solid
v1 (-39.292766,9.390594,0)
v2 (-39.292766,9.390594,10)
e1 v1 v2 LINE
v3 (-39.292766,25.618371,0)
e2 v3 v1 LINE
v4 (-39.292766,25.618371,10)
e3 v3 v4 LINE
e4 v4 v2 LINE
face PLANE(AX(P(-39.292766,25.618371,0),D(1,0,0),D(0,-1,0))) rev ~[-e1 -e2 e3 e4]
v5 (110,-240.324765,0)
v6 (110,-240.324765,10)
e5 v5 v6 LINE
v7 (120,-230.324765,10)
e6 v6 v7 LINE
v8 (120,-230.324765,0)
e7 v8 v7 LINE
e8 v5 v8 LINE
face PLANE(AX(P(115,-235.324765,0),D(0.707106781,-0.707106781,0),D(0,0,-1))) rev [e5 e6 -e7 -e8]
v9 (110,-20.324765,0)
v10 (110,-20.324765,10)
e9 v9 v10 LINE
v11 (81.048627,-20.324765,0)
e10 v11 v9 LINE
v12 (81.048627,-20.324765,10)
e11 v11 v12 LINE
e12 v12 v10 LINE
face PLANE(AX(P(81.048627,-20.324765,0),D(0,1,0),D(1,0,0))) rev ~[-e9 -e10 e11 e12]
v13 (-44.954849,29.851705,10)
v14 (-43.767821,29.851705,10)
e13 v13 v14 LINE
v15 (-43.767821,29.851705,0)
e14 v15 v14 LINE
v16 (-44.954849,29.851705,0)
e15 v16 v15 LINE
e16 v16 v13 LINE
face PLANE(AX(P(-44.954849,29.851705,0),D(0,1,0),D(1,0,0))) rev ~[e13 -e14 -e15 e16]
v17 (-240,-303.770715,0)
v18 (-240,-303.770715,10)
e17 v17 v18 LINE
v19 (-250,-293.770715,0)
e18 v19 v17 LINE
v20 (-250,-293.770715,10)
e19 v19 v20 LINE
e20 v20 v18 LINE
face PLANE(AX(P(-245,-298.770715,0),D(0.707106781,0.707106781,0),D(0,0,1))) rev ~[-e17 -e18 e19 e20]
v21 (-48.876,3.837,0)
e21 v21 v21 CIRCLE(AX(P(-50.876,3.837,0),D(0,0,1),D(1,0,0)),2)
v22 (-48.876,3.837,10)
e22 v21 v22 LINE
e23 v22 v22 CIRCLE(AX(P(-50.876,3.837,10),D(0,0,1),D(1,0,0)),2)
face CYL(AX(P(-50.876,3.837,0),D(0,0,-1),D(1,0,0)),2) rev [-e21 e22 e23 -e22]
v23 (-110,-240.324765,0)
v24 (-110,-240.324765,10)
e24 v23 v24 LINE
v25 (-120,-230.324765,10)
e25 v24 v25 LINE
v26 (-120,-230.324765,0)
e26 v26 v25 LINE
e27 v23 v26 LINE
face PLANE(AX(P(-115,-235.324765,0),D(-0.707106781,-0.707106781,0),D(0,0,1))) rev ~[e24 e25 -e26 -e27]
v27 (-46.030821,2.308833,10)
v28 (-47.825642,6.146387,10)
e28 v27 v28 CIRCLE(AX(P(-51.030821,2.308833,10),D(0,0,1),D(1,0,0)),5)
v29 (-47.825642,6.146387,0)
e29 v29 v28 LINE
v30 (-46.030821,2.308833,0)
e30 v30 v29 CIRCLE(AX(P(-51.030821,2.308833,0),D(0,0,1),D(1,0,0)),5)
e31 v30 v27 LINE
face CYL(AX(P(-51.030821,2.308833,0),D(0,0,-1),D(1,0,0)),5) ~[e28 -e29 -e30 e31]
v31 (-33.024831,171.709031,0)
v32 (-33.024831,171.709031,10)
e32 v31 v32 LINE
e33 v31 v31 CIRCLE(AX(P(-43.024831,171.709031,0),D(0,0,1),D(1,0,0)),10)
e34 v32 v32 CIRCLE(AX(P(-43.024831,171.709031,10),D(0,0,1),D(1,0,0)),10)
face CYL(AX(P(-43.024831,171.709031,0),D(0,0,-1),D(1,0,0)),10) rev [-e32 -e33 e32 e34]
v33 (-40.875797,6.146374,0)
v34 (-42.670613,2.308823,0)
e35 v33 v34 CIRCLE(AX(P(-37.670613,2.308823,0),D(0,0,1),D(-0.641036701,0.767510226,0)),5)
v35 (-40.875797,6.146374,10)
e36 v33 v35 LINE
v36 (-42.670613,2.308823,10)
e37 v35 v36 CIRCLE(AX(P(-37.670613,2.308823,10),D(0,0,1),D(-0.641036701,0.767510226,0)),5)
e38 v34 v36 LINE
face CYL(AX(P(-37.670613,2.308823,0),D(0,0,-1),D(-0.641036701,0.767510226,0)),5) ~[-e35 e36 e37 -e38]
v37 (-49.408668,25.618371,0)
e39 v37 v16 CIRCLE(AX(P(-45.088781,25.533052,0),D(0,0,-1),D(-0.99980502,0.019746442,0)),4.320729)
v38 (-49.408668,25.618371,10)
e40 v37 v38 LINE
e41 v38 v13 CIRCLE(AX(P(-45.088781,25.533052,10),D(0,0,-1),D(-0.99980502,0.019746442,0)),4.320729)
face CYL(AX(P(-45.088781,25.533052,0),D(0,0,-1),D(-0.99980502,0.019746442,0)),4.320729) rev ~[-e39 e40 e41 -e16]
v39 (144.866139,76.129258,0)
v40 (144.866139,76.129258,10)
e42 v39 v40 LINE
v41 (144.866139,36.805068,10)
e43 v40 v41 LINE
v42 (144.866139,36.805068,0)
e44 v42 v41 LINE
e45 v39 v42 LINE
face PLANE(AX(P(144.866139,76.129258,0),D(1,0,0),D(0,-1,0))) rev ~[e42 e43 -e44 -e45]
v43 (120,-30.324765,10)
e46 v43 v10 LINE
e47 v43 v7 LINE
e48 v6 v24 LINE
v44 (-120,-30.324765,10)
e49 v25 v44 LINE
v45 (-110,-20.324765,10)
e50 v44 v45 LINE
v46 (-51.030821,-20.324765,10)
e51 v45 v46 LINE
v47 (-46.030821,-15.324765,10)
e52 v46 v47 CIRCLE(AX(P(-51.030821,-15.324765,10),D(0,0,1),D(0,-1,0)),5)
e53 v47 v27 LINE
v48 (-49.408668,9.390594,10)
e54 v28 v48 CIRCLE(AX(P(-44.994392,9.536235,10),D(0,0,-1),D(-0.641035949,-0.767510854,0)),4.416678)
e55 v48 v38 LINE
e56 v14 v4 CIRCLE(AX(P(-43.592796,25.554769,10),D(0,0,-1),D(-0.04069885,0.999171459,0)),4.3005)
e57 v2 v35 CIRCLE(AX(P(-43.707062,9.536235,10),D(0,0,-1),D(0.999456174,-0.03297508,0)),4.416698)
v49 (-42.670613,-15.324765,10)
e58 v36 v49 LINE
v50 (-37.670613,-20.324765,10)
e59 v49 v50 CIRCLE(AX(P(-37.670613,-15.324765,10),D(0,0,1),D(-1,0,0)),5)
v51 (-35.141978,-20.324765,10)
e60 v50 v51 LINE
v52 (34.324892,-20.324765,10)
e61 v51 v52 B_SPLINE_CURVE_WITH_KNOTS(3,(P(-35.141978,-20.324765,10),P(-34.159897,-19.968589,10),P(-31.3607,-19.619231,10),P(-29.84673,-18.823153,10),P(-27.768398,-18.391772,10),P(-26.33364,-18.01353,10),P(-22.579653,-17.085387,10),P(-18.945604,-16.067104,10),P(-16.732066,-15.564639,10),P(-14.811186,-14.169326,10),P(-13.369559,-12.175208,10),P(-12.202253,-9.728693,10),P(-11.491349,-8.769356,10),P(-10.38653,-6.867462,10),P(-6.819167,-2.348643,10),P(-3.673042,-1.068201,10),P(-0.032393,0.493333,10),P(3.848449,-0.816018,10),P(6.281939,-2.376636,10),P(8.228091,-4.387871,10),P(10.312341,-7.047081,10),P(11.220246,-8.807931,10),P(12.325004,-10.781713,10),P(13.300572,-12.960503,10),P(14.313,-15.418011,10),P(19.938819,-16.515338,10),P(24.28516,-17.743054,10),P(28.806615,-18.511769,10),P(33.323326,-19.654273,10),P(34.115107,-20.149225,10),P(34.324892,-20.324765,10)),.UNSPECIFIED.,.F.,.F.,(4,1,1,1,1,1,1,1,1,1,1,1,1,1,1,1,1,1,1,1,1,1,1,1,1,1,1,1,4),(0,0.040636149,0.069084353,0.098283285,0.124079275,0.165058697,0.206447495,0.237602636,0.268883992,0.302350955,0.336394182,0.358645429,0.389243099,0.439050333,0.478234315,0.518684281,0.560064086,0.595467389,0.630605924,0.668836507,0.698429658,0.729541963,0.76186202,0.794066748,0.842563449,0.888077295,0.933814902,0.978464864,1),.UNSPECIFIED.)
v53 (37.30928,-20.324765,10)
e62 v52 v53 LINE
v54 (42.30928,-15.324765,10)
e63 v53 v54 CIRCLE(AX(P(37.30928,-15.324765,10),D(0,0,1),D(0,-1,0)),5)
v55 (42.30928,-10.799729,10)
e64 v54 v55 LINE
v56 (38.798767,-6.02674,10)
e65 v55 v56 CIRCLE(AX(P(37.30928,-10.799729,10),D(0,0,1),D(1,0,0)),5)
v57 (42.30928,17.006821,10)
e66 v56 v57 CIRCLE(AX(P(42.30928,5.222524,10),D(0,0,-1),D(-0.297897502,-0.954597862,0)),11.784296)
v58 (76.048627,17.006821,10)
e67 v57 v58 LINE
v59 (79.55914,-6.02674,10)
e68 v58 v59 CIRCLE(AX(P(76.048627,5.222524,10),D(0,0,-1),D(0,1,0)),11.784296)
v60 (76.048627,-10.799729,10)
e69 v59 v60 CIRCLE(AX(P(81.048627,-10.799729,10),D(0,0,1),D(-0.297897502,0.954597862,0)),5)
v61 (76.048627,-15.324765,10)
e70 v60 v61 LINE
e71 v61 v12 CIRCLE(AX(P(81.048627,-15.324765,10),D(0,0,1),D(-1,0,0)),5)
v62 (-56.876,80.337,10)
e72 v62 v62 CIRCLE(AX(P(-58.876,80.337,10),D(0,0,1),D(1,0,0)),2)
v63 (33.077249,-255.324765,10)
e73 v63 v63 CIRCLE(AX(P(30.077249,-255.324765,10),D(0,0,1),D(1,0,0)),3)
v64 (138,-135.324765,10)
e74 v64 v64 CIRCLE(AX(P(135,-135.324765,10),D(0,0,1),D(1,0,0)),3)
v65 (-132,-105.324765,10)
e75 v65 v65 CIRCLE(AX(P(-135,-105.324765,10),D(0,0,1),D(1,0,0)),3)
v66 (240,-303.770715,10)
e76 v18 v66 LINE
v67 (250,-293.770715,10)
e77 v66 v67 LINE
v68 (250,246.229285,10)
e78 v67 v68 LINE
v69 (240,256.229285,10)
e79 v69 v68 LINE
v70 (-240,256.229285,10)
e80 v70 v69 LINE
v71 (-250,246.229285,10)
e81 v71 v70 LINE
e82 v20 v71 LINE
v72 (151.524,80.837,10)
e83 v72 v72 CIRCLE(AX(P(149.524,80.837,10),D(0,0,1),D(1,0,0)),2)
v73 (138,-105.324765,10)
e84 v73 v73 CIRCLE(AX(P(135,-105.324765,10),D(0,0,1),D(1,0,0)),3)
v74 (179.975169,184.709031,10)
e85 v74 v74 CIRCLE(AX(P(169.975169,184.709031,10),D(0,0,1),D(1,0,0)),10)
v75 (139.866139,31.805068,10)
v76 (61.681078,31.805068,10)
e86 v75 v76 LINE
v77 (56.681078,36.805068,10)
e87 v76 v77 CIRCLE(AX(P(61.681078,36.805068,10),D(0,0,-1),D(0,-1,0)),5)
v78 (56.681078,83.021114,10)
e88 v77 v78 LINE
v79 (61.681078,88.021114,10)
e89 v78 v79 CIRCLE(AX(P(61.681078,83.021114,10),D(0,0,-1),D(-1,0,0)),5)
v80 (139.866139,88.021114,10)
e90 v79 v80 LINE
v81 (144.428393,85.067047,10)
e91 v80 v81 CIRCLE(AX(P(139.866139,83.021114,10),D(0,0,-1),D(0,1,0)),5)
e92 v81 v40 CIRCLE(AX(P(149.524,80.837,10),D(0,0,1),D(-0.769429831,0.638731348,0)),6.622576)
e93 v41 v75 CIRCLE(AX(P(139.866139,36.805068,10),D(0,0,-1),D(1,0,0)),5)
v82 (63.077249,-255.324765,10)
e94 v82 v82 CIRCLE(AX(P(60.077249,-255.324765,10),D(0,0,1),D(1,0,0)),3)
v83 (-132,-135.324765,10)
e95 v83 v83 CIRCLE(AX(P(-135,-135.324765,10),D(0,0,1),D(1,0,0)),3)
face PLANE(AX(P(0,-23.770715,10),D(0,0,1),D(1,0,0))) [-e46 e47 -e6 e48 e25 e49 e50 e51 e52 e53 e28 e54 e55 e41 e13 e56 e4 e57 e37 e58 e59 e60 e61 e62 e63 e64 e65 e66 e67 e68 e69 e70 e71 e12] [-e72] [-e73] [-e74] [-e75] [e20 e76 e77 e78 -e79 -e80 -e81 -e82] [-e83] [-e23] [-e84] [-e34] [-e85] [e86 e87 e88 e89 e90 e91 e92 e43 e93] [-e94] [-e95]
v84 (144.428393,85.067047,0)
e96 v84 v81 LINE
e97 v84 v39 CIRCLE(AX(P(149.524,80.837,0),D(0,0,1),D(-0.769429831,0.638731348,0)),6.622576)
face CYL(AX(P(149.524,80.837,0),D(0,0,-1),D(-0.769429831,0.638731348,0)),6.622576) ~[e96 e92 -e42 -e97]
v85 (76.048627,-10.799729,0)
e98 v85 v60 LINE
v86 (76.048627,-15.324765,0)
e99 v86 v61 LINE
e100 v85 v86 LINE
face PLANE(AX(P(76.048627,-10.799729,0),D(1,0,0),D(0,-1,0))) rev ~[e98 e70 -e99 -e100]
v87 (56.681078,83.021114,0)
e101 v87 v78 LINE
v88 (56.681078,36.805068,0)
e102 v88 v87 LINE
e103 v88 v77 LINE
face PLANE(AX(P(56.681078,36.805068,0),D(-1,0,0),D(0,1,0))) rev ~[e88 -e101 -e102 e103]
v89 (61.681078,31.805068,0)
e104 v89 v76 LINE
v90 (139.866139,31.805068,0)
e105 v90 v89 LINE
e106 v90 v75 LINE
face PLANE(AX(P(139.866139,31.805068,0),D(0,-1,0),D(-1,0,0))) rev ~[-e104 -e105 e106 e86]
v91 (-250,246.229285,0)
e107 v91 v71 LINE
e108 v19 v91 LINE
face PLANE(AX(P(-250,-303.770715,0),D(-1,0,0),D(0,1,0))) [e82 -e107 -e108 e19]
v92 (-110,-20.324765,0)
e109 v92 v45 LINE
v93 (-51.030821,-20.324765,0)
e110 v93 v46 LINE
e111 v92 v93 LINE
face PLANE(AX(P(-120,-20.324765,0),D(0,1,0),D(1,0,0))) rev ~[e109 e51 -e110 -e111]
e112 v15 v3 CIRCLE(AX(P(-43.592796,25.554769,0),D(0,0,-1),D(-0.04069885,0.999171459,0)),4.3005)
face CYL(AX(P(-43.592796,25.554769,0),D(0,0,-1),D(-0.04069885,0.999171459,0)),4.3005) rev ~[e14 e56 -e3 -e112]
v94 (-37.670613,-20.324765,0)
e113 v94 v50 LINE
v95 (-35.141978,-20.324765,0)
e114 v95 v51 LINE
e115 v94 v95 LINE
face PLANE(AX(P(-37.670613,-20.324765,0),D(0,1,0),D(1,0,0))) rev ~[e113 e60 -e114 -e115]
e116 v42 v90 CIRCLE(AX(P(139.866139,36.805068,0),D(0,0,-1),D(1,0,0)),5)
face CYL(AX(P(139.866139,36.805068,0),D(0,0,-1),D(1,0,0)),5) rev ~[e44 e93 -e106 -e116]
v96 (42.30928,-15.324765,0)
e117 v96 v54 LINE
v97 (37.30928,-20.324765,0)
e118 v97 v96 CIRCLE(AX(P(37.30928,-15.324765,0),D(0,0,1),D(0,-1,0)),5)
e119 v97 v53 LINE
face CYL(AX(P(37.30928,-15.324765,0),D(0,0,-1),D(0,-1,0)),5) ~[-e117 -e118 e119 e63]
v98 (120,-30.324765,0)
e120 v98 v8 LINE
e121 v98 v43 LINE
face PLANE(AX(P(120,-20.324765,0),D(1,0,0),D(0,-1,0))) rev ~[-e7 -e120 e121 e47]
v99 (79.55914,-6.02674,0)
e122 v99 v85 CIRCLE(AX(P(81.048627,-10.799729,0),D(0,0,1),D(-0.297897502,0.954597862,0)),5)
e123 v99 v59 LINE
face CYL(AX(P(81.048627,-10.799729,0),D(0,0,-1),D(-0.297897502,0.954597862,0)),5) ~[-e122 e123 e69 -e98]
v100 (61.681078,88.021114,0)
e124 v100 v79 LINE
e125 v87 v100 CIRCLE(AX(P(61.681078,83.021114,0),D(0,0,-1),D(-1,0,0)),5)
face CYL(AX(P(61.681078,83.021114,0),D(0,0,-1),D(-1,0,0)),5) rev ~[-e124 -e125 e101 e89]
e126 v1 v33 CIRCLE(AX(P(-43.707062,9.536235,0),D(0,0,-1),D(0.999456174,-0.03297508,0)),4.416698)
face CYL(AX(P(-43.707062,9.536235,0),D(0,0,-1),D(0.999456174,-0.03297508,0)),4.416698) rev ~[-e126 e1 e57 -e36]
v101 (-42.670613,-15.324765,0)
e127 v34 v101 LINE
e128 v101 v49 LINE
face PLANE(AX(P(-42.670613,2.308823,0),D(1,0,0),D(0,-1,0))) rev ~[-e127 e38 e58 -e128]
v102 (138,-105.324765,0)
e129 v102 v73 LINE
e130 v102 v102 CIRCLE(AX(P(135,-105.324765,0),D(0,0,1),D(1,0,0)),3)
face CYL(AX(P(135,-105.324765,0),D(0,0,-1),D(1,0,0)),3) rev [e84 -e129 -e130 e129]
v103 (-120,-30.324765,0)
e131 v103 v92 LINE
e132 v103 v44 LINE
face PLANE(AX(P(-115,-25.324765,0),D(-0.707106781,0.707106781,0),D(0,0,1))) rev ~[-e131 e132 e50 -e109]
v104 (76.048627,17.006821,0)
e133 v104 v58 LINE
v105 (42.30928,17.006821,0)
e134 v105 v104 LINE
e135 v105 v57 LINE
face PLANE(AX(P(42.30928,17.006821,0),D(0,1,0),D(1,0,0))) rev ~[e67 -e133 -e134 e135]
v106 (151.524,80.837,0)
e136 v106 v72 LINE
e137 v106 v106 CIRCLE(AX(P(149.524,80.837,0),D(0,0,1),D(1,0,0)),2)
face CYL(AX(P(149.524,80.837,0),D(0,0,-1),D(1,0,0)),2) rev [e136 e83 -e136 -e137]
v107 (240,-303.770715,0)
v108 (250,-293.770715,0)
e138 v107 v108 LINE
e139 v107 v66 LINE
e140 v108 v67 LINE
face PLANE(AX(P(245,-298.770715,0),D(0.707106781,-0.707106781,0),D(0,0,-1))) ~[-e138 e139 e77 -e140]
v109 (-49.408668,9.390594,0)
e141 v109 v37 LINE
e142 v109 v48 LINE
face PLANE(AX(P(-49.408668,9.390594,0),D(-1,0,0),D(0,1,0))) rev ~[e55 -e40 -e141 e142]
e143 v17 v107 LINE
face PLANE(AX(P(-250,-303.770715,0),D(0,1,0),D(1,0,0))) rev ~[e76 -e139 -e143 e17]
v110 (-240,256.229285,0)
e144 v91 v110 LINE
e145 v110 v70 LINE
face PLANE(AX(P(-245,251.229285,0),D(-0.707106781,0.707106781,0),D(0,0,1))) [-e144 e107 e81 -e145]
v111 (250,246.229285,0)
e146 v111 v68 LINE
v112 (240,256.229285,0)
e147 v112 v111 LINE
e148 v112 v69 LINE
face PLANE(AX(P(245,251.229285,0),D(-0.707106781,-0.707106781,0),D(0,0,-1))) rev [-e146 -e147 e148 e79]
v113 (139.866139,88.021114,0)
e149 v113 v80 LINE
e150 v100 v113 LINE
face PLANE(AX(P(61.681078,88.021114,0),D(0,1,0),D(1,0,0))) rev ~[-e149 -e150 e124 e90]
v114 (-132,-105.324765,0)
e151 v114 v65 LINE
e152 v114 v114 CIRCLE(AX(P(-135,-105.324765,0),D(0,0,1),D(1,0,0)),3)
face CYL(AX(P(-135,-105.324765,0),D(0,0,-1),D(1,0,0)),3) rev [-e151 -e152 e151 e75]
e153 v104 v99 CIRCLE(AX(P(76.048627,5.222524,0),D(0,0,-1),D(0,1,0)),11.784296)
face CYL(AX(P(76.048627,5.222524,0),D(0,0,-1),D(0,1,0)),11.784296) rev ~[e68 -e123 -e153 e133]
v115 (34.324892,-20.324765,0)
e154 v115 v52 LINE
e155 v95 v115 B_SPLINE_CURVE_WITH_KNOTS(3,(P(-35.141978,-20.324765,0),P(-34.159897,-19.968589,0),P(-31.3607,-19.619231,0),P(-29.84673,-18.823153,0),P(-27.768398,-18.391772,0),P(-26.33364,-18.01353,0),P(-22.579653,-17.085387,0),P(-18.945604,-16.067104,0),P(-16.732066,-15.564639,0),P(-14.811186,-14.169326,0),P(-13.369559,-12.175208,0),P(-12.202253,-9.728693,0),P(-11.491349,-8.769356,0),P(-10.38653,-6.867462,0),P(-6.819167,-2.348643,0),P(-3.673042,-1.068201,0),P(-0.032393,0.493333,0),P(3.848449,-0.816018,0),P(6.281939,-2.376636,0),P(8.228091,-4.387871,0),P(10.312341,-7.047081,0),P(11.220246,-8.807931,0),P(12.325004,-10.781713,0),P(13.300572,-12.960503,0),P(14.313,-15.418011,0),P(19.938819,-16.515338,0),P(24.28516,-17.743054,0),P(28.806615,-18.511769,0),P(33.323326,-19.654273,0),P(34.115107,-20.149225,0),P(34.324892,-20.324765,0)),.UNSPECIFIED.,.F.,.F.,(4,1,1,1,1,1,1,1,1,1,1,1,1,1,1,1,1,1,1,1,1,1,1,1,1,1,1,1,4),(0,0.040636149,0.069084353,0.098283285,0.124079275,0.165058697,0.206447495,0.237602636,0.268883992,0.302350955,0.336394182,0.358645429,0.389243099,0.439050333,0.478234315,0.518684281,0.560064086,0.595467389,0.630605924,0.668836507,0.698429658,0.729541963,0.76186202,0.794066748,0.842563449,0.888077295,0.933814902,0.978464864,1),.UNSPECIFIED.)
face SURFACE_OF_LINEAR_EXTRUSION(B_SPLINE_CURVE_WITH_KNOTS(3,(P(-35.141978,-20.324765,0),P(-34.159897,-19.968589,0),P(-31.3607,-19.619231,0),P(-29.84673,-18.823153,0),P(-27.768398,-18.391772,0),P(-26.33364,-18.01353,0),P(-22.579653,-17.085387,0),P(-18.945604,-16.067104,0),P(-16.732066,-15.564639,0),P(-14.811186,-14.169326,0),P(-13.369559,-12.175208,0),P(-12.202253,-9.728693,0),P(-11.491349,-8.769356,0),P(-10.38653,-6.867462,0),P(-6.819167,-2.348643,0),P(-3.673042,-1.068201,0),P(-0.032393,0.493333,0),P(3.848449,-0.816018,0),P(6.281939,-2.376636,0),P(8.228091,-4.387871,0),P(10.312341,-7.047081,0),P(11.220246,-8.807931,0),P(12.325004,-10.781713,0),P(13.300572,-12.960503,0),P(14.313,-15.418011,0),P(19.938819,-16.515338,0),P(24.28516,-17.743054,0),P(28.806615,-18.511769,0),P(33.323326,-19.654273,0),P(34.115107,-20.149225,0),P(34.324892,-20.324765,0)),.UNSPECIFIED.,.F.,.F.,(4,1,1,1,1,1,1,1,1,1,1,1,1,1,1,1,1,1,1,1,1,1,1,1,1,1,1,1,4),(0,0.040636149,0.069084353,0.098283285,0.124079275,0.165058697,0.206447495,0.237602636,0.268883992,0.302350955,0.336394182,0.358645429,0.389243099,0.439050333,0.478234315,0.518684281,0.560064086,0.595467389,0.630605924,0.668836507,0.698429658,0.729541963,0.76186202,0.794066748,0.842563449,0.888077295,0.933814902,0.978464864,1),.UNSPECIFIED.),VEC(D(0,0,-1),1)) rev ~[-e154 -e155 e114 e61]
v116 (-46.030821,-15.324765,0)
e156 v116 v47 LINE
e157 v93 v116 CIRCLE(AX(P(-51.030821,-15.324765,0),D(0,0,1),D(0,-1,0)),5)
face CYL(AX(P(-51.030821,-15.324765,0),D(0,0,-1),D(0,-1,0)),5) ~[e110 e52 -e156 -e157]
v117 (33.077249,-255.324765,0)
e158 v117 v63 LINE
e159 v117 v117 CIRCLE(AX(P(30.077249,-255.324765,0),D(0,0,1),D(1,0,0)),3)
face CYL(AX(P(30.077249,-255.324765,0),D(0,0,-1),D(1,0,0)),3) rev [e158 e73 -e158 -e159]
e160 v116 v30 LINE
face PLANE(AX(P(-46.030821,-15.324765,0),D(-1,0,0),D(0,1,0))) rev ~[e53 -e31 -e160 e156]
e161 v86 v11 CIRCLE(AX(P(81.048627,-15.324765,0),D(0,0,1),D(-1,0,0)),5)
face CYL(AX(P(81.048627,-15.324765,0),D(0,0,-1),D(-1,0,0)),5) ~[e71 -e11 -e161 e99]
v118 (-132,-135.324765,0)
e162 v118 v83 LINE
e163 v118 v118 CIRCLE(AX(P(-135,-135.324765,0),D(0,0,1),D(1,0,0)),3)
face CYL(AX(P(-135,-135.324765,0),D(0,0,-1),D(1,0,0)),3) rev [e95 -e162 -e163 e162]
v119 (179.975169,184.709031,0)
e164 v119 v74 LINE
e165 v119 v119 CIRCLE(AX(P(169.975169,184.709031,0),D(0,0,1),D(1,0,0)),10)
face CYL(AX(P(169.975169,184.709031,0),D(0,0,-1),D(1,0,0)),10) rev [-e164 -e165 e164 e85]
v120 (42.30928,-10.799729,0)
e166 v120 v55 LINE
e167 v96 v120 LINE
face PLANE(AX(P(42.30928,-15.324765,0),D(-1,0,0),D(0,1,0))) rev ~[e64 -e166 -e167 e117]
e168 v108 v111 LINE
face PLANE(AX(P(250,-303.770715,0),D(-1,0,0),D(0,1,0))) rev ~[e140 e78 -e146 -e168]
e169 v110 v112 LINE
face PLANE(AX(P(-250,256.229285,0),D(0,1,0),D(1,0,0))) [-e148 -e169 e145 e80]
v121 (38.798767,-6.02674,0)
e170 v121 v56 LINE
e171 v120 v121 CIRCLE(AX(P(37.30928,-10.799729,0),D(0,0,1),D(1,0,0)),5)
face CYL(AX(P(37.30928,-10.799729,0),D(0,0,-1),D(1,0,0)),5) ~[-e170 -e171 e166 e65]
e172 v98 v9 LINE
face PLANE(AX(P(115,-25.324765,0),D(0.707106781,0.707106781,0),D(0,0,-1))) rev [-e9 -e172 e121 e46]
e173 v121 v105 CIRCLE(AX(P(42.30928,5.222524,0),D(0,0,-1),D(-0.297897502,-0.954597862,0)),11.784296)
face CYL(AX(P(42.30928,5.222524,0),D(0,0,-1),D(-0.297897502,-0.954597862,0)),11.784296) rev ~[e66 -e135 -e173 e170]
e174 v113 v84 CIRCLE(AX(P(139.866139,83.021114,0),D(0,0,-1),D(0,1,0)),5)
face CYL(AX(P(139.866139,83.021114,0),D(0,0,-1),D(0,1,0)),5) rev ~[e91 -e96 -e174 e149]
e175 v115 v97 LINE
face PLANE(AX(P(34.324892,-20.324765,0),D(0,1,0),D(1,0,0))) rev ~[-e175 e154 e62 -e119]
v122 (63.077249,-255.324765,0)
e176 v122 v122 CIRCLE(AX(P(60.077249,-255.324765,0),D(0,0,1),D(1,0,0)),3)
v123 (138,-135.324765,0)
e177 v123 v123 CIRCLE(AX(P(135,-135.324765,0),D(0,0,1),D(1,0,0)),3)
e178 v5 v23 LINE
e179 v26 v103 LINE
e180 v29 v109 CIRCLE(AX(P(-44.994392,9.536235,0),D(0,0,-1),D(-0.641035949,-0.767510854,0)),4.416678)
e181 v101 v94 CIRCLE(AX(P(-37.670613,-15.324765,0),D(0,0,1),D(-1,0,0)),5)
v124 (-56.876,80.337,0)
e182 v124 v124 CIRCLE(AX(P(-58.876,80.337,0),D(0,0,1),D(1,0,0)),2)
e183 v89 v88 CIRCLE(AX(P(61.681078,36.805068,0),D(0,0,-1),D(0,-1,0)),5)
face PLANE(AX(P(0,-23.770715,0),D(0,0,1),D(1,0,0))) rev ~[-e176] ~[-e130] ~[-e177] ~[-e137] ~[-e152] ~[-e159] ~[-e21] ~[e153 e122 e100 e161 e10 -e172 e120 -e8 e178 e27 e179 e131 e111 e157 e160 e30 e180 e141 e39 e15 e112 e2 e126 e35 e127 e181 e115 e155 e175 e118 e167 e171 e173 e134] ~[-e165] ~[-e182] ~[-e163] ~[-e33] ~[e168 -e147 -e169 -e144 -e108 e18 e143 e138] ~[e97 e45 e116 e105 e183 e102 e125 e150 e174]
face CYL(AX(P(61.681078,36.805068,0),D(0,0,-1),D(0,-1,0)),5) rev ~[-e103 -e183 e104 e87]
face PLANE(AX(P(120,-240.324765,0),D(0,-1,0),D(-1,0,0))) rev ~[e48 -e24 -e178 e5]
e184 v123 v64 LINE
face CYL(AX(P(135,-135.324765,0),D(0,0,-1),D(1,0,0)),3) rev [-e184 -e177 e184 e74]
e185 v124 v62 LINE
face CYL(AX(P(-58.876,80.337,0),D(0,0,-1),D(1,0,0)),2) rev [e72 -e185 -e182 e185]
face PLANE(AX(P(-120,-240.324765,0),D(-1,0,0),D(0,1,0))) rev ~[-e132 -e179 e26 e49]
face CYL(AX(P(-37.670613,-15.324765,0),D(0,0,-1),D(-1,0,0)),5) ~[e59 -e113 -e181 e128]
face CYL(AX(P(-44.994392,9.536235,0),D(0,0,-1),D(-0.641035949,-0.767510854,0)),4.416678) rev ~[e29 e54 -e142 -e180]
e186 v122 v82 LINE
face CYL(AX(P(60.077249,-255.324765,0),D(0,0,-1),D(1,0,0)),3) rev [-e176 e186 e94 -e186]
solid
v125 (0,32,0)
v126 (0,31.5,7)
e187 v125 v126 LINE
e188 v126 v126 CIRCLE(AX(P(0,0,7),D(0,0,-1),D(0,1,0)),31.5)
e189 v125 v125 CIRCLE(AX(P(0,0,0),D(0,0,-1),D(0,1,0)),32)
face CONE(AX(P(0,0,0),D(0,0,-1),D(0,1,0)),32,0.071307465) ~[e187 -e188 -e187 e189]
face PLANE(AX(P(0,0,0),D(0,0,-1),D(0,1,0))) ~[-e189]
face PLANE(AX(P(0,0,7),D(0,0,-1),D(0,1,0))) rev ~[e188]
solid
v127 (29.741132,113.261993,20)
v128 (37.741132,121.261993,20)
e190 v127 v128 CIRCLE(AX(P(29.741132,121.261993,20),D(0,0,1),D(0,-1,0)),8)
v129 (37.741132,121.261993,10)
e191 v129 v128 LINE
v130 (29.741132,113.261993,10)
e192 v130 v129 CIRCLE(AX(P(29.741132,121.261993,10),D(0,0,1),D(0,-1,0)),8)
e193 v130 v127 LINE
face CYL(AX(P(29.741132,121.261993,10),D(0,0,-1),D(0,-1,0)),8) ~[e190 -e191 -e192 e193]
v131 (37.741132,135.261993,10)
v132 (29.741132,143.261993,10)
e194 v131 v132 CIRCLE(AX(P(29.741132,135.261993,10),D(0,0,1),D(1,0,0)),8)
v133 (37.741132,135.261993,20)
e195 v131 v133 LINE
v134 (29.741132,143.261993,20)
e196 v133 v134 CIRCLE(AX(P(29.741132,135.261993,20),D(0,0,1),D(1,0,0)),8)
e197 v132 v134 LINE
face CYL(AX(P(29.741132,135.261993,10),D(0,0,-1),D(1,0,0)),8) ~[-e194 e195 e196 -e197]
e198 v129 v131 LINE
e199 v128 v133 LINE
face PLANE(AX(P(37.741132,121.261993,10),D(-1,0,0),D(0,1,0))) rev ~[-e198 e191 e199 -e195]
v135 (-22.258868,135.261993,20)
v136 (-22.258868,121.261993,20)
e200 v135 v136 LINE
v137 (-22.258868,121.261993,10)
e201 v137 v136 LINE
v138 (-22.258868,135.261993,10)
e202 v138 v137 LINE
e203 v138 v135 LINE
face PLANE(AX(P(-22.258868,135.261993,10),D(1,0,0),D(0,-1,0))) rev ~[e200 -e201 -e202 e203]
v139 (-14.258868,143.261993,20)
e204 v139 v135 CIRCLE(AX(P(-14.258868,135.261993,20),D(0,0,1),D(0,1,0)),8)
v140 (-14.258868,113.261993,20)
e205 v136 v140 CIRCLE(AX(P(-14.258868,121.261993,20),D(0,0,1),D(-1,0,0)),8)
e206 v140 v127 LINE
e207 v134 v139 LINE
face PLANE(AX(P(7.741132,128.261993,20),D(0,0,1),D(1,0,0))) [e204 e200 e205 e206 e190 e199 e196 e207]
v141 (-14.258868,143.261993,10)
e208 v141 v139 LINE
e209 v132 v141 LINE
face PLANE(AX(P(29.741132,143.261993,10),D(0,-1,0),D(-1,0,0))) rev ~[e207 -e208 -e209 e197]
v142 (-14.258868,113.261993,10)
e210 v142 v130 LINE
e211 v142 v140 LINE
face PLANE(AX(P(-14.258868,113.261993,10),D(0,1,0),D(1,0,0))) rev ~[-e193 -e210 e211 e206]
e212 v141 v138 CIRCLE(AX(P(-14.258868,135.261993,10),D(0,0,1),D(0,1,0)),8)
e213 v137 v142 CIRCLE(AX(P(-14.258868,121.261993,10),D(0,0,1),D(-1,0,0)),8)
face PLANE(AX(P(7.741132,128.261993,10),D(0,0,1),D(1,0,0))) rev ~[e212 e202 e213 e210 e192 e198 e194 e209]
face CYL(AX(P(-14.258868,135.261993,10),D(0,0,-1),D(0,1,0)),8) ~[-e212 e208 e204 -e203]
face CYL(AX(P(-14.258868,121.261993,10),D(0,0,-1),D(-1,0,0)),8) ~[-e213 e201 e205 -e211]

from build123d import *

# Parameters (mm, degrees)
F1_W     = 500
F1_H     = 560
F1_R     = 3
F1_R_2   = 2
F1_R_3   = 10
F2_DEPTH = 10
F4_DEPTH = 10
F5_SIZE  = 10


with BuildPart() as f2:
    # F1 (on Top) → F2 (new body)
    with BuildSketch(Plane.XY):
        with Locations((0, -23.7707149982)):
            Rectangle(F1_W, F1_H)
        with Locations((30.0772486633, -255.3247647732)):
            Circle(F1_R, mode=Mode.SUBTRACT)
        with Locations((60.0772486633, -255.3247647732)):
            Circle(F1_R, mode=Mode.SUBTRACT)
        with Locations((-135, -135.3247647732)):
            Circle(F1_R, mode=Mode.SUBTRACT)
        with Locations((-135, -105.3247647732)):
            Circle(F1_R, mode=Mode.SUBTRACT)
        with Locations((-50.876, 3.837)):
            Circle(F1_R_2, mode=Mode.SUBTRACT)
        with Locations((-58.876, 80.337)):
            Circle(F1_R_2, mode=Mode.SUBTRACT)
        with Locations((-43.0248305202, 171.7090308666)):
            Circle(F1_R_3, mode=Mode.SUBTRACT)
        with BuildLine():
            Line((-120, -240.3247647732), (-120, -20.3247647732))
            Line((-120, -20.3247647732), (-51.0308213367, -20.3247647732))
            ThreePointArc((-51.0308213367, -20.3247647732), (-47.4952874307, -18.8602986792), (-46.0308213367, -15.3247647732))
            Line((-46.0308213367, -15.3247647732), (-46.0308213367, 2.308832501))
            ThreePointArc((-46.0308213367, 2.308832501), (-46.5016989751, 4.4270984509), (-47.8256415904, 6.1463867735))
            ThreePointArc((-47.8256415904, 6.1463867735), (-48.9637284761, 7.5993782677), (-49.4086683367, 9.3905942128))
            Line((-49.4086683367, 9.3905942128), (-49.4086683367, 25.6183712128))
            ThreePointArc((-49.4086683367, 25.6183712128), (-48.0654966834, 28.6648038331), (-44.9548493367, 29.8517052128))
            Line((-44.9548493367, 29.8517052128), (-43.7678212187, 29.8517052128))
            ThreePointArc((-43.7678212187, 29.8517052128), (-40.637428861, 28.6788851912), (-39.2927663367, 25.6183712128))
            Line((-39.2927663367, 25.6183712128), (-39.2927663367, 9.3905942128))
            ThreePointArc((-39.2927663367, 9.3905942128), (-39.7377071117, 7.5993718655), (-40.8757968434, 6.1463744279))
            ThreePointArc((-40.8757968434, 6.1463744279), (-42.1997367361, 4.4270870271), (-42.6706133367, 2.3088232963))
            Line((-42.6706133367, 2.3088232963), (-42.6706133367, -15.3247647732))
            ThreePointArc((-42.6706133367, -15.3247647732), (-41.2061472426, -18.8602986792), (-37.6706133367, -20.3247647732))
            Line((-37.6706133367, -20.3247647732), (-35.1419784129, -20.3247647732))
            add(Edge.make_bspline(
                [(-35.1419784129, -20.3247647732), (-34.1598968907, -19.9685891101), (-31.3607001601, -19.6192307571), (-29.8467303867, -18.8231529819), (-27.7683977823, -18.3917721381), (-26.3336397017, -18.0135299785), (-22.5796525571, -17.0853870147), (-18.9456036242, -16.0671039066), (-16.7320655768, -15.5646387194), (-14.8111856629, -14.16932632), (-13.3695590782, -12.1752079912), (-12.2022525833, -9.7286932544), (-11.491348561, -8.7693558731), (-10.3865304992, -6.8674624113), (-6.8191670577, -2.3486430291), (-3.6730417858, -1.0682009745), (-0.0323925139, 0.4933333957), (3.8484487001, -0.8160184171), (6.2819386152, -2.3766355402), (8.2280909316, -4.3878710315), (10.3123406285, -7.0470809276), (11.2202460098, -8.8079307876), (12.3250038703, -10.7817132124), (13.3005723278, -12.9605031724), (14.3129998399, -15.4180110053), (19.9388190144, -16.5153375349), (24.2851598431, -17.7430543029), (28.8066153808, -18.5117694503), (33.3233263839, -19.6542728052), (34.1151070689, -20.1492249102), (34.3248918653, -20.3247647732)],
                knots=[0, 0, 0, 0, 0.0406361494, 0.0690843533, 0.0982832849, 0.1240792745, 0.1650586975, 0.2064474949, 0.237602636, 0.2688839918, 0.3023509551, 0.3363941823, 0.3586454287, 0.3892430987, 0.4390503332, 0.478234315, 0.5186842811, 0.5600640859, 0.5954673894, 0.6306059239, 0.6688365072, 0.6984296576, 0.7295419634, 0.7618620205, 0.7940667479, 0.8425634492, 0.8880772951, 0.9338149024, 0.9784648643, 1, 1, 1, 1], degree=3))
            Line((34.3248918653, -20.3247647732), (37.3092798889, -20.3247647732))
            ThreePointArc((37.3092798889, -20.3247647732), (40.8448137948, -18.8602986792), (42.3092798889, -15.3247647732))
            Line((42.3092798889, -15.3247647732), (42.3092798889, -10.7997291517))
            ThreePointArc((42.3092798889, -10.7997291517), (41.3371476596, -7.8372502536), (38.7987674003, -6.0267398417))
            ThreePointArc((38.7987674003, -6.0267398417), (30.6595093232, 6.9980494805), (42.3092798889, 17.0068208687))
            Line((42.3092798889, 17.0068208687), (76.0486274958, 17.0068208687))
            ThreePointArc((76.0486274958, 17.0068208687), (87.6983980614, 6.9980494805), (79.5591399843, -6.0267398417))
            ThreePointArc((79.5591399843, -6.0267398417), (77.020759725, -7.8372502536), (76.0486274958, -10.7997291517))
            Line((76.0486274958, -10.7997291517), (76.0486274958, -15.3247647732))
            ThreePointArc((76.0486274958, -15.3247647732), (77.5130935898, -18.8602986792), (81.0486274958, -20.3247647732))
            Line((81.0486274958, -20.3247647732), (120, -20.3247647732))
            Line((120, -20.3247647732), (120, -240.3247647732))
            Line((120, -240.3247647732), (-120, -240.3247647732))
        make_face(mode=Mode.SUBTRACT)
        with Locations((135, -135.3247647732)):
            Circle(F1_R, mode=Mode.SUBTRACT)
        with Locations((135, -105.3247647732)):
            Circle(F1_R, mode=Mode.SUBTRACT)
        with BuildLine():
            ThreePointArc((56.6810779274, 83.0211144686), (58.1455440214, 86.5566483745), (61.6810779274, 88.0211144686))
            Line((61.6810779274, 88.0211144686), (139.8661386967, 88.0211144686))
            ThreePointArc((139.8661386967, 88.0211144686), (142.5837054983, 87.2181170512), (144.4283926506, 85.0670467401))
            ThreePointArc((144.4283926506, 85.0670467401), (142.9093529183, 80.513034466), (144.8661386967, 76.129257679))
            Line((144.8661386967, 76.129257679), (144.8661386967, 36.8050682545))
            ThreePointArc((144.8661386967, 36.8050682545), (143.4016726026, 33.2695343485), (139.8661386967, 31.8050682545))
            Line((139.8661386967, 31.8050682545), (61.6810779274, 31.8050682545))
            ThreePointArc((61.6810779274, 31.8050682545), (58.1455440214, 33.2695343485), (56.6810779274, 36.8050682545))
            Line((56.6810779274, 36.8050682545), (56.6810779274, 83.0211144686))
        make_face(mode=Mode.SUBTRACT)
        with Locations((149.524, 80.837)):
            Circle(F1_R_2, mode=Mode.SUBTRACT)
        with Locations((169.9751694798, 184.7090308666)):
            Circle(F1_R_3, mode=Mode.SUBTRACT)
    extrude(amount=F2_DEPTH)

    # F5
    f5_edges = [f2.edges().sort_by_distance(p)[0] for p in [
        (-120, -20.324765, 5),
        (120, -20.324765, 5),
        (120, -240.324765, 5),
        (-120, -240.324765, 5),
        (250, -303.770715, 5),
        (250, 256.229285, 5),
        (-250, 256.229285, 5),
        (-250, -303.770715, 5),
    ]]
    chamfer(f5_edges, length=F5_SIZE)


with BuildPart() as f4:
    # F3 (on face) → F4 (new body)
    with BuildSketch(Plane.XY.offset(10)):
        with BuildLine():
            ThreePointArc((37.7411322854, 135.2619925924), (35.3979865349, 140.9188468419), (29.7411322854, 143.2619925924))
            Line((29.7411322854, 143.2619925924), (-14.2588677146, 143.2619925924))
            ThreePointArc((-14.2588677146, 143.2619925924), (-19.915721964, 140.9188468419), (-22.2588677146, 135.2619925924))
            Line((-22.2588677146, 135.2619925924), (-22.2588677146, 121.2619925924))
            ThreePointArc((-22.2588677146, 121.2619925924), (-19.915721964, 115.6051383429), (-14.2588677146, 113.2619925924))
            Line((-14.2588677146, 113.2619925924), (29.7411322854, 113.2619925924))
            ThreePointArc((29.7411322854, 113.2619925924), (35.3979865349, 115.6051383429), (37.7411322854, 121.2619925924))
            Line((37.7411322854, 121.2619925924), (37.7411322854, 135.2619925924))
        make_face()
    extrude(amount=F4_DEPTH)


with BuildPart() as f7:
    # F6 (on Right) → F7 (revolve)
    with BuildSketch(Plane.YZ):
        Polygon((0, 7), (0, 0), (32, 0), (31.5, 7), align=None)
    revolve(axis=Axis((0, 0, 3.5), (0, 0, -1)))


solid = Compound([f2.part, f4.part, f7.part])
